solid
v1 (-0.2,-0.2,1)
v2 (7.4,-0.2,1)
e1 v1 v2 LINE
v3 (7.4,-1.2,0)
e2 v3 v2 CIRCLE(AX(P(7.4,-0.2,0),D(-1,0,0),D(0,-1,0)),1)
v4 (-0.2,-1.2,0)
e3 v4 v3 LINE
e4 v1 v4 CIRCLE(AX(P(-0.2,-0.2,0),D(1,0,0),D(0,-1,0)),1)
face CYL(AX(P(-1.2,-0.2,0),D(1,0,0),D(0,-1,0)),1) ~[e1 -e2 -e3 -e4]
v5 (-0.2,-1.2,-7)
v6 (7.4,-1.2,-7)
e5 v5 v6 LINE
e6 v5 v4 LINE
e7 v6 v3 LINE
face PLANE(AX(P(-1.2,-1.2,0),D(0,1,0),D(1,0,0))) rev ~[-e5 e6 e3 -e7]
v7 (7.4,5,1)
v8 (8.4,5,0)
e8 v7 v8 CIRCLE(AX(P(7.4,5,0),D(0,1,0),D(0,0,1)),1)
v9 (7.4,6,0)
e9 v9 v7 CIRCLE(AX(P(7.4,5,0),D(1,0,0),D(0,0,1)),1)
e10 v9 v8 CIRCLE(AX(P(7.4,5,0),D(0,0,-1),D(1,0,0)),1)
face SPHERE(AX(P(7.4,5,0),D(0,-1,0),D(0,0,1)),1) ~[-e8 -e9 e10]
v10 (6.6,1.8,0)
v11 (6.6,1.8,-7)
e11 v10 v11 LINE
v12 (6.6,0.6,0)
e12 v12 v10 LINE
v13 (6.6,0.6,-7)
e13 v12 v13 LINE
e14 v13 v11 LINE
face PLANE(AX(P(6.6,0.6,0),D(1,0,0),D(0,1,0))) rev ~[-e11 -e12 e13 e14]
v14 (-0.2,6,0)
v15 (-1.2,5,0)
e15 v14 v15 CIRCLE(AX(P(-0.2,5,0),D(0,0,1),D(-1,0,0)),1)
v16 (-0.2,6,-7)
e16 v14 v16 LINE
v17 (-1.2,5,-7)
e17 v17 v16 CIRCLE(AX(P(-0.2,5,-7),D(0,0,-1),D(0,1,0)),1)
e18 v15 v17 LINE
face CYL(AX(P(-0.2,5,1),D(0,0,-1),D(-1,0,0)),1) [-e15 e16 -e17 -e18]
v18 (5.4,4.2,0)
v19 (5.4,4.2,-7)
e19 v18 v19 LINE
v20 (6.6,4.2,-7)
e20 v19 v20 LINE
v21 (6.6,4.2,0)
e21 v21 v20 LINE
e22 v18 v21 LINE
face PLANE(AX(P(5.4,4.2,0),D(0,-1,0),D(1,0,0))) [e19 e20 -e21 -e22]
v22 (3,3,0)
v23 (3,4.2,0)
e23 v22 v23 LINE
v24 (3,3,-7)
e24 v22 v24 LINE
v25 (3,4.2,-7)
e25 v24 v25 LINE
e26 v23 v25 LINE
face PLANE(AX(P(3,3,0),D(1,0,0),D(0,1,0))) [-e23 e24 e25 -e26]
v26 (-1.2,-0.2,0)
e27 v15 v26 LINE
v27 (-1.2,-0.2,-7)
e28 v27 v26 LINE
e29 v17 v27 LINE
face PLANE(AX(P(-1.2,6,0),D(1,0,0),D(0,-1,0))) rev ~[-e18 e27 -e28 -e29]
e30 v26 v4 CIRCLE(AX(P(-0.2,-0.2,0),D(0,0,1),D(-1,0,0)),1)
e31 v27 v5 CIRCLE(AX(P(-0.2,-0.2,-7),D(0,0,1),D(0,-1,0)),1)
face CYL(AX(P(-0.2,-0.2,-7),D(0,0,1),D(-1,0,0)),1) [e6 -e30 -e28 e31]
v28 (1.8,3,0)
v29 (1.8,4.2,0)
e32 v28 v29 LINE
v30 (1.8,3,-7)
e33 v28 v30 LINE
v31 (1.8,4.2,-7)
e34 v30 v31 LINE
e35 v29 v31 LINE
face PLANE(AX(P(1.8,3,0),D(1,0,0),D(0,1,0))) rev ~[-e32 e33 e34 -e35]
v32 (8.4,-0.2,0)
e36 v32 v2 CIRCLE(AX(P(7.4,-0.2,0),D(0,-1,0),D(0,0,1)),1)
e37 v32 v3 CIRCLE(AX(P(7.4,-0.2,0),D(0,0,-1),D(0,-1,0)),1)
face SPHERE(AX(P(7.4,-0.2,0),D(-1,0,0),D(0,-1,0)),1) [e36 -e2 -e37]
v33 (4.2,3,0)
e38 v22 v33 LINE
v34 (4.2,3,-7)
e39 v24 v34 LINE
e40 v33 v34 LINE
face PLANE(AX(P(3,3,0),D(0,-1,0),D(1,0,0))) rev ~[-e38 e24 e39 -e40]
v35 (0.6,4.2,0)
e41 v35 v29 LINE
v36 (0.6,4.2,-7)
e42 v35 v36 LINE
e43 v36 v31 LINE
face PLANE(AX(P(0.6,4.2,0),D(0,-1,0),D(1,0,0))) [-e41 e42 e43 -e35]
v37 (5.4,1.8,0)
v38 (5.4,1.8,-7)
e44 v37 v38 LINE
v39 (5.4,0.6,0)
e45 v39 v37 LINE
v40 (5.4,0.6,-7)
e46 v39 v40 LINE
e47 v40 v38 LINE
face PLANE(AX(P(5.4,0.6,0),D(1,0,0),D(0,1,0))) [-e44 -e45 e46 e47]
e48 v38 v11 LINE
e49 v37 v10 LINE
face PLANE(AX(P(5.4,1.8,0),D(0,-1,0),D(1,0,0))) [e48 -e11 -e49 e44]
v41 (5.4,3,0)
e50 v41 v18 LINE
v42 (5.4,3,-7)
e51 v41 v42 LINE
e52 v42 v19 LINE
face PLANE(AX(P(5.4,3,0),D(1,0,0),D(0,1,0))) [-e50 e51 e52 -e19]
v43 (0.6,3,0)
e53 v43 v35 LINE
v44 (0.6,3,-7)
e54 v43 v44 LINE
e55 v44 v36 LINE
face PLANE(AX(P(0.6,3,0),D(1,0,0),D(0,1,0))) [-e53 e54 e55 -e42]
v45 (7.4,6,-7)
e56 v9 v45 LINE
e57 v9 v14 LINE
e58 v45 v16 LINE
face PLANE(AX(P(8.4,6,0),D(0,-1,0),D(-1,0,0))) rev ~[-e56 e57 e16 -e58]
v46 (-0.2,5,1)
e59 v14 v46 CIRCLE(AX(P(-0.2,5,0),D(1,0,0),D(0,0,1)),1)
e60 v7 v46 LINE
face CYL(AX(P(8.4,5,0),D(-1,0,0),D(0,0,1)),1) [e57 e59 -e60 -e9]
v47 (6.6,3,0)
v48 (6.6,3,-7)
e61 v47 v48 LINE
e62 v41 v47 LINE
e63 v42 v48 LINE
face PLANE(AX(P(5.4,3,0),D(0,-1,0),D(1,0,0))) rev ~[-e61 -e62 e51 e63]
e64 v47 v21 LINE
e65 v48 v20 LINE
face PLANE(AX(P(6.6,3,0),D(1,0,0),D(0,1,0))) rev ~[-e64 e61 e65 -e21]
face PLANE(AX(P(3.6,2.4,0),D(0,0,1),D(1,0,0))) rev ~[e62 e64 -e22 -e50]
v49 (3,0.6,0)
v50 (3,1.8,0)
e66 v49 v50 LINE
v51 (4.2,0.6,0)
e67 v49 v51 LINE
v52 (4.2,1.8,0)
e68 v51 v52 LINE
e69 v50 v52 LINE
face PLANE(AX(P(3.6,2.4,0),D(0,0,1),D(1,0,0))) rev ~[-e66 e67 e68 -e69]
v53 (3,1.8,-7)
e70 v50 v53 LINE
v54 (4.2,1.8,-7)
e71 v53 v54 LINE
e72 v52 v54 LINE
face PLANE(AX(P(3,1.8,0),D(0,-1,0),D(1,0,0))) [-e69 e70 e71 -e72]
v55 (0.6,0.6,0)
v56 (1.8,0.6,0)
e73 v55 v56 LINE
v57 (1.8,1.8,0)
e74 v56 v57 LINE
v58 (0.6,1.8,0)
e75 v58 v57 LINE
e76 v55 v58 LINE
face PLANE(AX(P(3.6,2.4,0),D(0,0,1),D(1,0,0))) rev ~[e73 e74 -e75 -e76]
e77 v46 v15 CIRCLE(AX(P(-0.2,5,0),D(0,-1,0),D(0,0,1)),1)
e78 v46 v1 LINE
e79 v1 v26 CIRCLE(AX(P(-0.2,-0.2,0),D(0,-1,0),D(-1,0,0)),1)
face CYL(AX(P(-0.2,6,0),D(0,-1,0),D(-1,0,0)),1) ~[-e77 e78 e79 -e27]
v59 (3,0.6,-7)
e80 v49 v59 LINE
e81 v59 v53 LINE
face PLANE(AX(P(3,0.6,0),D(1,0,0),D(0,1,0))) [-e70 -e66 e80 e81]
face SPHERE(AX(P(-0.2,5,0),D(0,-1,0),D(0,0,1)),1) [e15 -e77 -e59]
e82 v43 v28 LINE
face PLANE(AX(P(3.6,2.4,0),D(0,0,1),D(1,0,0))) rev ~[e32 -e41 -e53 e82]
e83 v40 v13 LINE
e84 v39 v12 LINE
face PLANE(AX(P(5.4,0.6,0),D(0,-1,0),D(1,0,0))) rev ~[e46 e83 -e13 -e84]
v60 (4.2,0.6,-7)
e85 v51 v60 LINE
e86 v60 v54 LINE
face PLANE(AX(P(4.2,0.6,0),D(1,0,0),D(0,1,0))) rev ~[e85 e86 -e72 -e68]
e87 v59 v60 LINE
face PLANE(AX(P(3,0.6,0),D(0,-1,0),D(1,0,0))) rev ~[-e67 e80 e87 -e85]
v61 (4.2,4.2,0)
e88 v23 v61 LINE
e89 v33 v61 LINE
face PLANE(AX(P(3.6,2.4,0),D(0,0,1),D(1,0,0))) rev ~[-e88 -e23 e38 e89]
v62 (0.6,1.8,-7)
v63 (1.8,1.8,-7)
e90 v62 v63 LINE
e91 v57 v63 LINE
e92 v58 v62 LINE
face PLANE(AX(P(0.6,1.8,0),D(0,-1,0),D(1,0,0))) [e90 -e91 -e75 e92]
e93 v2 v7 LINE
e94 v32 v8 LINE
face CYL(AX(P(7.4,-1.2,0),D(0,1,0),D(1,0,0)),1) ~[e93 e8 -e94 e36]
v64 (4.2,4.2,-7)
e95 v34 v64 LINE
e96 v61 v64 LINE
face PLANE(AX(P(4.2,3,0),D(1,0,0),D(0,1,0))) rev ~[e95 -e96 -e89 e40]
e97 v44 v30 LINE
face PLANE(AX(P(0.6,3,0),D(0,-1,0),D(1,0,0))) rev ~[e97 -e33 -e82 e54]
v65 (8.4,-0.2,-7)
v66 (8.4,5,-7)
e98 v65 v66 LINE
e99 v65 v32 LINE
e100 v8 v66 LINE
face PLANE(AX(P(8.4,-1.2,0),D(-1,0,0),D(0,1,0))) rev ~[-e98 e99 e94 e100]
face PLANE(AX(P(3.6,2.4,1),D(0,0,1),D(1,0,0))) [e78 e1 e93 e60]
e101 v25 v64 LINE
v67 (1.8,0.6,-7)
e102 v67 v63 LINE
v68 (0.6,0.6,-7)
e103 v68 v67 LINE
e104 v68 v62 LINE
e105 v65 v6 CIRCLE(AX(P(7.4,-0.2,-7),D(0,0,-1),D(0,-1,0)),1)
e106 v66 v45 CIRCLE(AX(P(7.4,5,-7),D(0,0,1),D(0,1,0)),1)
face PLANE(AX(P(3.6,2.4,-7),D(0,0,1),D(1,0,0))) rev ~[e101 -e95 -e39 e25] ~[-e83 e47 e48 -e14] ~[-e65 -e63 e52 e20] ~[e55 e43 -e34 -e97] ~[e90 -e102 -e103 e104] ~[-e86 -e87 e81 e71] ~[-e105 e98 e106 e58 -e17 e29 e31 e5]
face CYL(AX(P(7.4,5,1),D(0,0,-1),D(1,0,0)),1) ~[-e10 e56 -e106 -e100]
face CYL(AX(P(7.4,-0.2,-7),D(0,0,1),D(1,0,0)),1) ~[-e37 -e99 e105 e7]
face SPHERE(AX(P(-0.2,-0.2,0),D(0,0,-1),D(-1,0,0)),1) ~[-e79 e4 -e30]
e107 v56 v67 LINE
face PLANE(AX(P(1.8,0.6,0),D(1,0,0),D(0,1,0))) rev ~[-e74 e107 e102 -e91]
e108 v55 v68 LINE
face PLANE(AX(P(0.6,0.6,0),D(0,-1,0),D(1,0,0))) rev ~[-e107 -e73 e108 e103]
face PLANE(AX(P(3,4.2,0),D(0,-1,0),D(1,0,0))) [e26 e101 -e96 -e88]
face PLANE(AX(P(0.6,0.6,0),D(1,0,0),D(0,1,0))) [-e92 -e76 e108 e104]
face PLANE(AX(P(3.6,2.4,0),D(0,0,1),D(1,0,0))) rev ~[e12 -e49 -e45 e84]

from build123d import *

# Parameters (mm, degrees)
F0_W     = 2.4
F0_H     = 2.4
F0_W_2   = 1.2
F0_H_2   = 1.2
F1_DEPTH = 7
F2_DEPTH = 1
F3_R     = 1


# Not quite as in the source:
# - a feature names something its author has since deleted; it is built from what else it names


with BuildPart() as f1:
    # F0 (on Top) → F1 (new body)
    with BuildSketch(Plane.XY):
        Polygon((-1.2, 6), (-1.2, 2.4), (-1.2, -1.2), (2.4, -1.2), (4.8, -1.2), (8.4, -1.2), (8.4, 2.4), (8.4, 6), (4.8, 6), (2.4, 6), align=None)
        Polygon((2.4, 0), (0, 0), (0, 2.4), (0, 4.8), (2.4, 4.8), (4.8, 4.8), (7.2, 4.8), (7.2, 2.4), (7.2, 0), (4.8, 0), align=None, mode=Mode.SUBTRACT)
        with Locations((1.2, 3.6)):
            Rectangle(F0_W, F0_H)
        with Locations((1.2, 3.6)):
            Rectangle(F0_W_2, F0_H_2, mode=Mode.SUBTRACT)
        with Locations((3.6, 3.6)):
            Rectangle(F0_W, F0_H)
        with Locations((3.6, 3.6)):
            Rectangle(F0_W_2, F0_H_2, mode=Mode.SUBTRACT)
        with Locations((6, 3.6)):
            Rectangle(F0_W, F0_H)
        with Locations((6, 3.6)):
            Rectangle(F0_W_2, F0_H_2, mode=Mode.SUBTRACT)
        with Locations((6, 1.2)):
            Rectangle(F0_W, F0_H)
        with Locations((6, 1.2)):
            Rectangle(F0_W_2, F0_H_2, mode=Mode.SUBTRACT)
        with Locations((3.6, 1.2)):
            Rectangle(F0_W, F0_H)
        with Locations((3.6, 1.2)):
            Rectangle(F0_W_2, F0_H_2, mode=Mode.SUBTRACT)
        with Locations((1.2, 1.2)):
            Rectangle(F0_W, F0_H)
        with Locations((1.2, 1.2)):
            Rectangle(F0_W_2, F0_H_2, mode=Mode.SUBTRACT)
    extrude(amount=-F1_DEPTH)

    # F0 (on Top) → F2 (join)
    with BuildSketch(Plane.XY):
        Polygon((-1.2, 6), (-1.2, 2.4), (-1.2, -1.2), (2.4, -1.2), (4.8, -1.2), (8.4, -1.2), (8.4, 2.4), (8.4, 6), (4.8, 6), (2.4, 6), align=None)
        Polygon((2.4, 0), (0, 0), (0, 2.4), (0, 4.8), (2.4, 4.8), (4.8, 4.8), (7.2, 4.8), (7.2, 2.4), (7.2, 0), (4.8, 0), align=None, mode=Mode.SUBTRACT)
        with Locations((3.6, 3.6)):
            Rectangle(F0_W, F0_H)
        with Locations((3.6, 3.6)):
            Rectangle(F0_W_2, F0_H_2, mode=Mode.SUBTRACT)
        with Locations((6, 3.6)):
            Rectangle(F0_W, F0_H)
        with Locations((6, 3.6)):
            Rectangle(F0_W_2, F0_H_2, mode=Mode.SUBTRACT)
        with Locations((1.2, 3.6)):
            Rectangle(F0_W, F0_H)
        with Locations((1.2, 3.6)):
            Rectangle(F0_W_2, F0_H_2, mode=Mode.SUBTRACT)
        with Locations((1.2, 1.2)):
            Rectangle(F0_W, F0_H)
        with Locations((1.2, 1.2)):
            Rectangle(F0_W_2, F0_H_2, mode=Mode.SUBTRACT)
        with Locations((3.6, 1.2)):
            Rectangle(F0_W, F0_H)
        with Locations((3.6, 1.2)):
            Rectangle(F0_W_2, F0_H_2, mode=Mode.SUBTRACT)
        with Locations((6, 1.2)):
            Rectangle(F0_W, F0_H)
        with Locations((6, 1.2)):
            Rectangle(F0_W_2, F0_H_2, mode=Mode.SUBTRACT)
        with Locations((6, 3.6)):
            Rectangle(F0_W_2, F0_H_2)
        with Locations((3.6, 3.6)):
            Rectangle(F0_W_2, F0_H_2)
        with Locations((1.2, 3.6)):
            Rectangle(F0_W_2, F0_H_2)
        with Locations((1.2, 1.2)):
            Rectangle(F0_W_2, F0_H_2)
        with Locations((3.6, 1.2)):
            Rectangle(F0_W_2, F0_H_2)
        with Locations((6, 1.2)):
            Rectangle(F0_W_2, F0_H_2)
    extrude(amount=F2_DEPTH)

    # F3
    f3_edges = [f1.edges().sort_by_distance(p)[0] for p in [
        (-1.2, -1.2, -3),
        (-1.2, 2.4, 1),
        (3.6, -1.2, 1),
        (8.4, -1.2, -3),
        (8.4, 2.4, 1),
        (3.6, 6, 1),
        (8.4, 6, -3),
        (-1.2, 6, -3),
    ]]
    fillet(f3_edges, radius=F3_R)


solid = f1.part
